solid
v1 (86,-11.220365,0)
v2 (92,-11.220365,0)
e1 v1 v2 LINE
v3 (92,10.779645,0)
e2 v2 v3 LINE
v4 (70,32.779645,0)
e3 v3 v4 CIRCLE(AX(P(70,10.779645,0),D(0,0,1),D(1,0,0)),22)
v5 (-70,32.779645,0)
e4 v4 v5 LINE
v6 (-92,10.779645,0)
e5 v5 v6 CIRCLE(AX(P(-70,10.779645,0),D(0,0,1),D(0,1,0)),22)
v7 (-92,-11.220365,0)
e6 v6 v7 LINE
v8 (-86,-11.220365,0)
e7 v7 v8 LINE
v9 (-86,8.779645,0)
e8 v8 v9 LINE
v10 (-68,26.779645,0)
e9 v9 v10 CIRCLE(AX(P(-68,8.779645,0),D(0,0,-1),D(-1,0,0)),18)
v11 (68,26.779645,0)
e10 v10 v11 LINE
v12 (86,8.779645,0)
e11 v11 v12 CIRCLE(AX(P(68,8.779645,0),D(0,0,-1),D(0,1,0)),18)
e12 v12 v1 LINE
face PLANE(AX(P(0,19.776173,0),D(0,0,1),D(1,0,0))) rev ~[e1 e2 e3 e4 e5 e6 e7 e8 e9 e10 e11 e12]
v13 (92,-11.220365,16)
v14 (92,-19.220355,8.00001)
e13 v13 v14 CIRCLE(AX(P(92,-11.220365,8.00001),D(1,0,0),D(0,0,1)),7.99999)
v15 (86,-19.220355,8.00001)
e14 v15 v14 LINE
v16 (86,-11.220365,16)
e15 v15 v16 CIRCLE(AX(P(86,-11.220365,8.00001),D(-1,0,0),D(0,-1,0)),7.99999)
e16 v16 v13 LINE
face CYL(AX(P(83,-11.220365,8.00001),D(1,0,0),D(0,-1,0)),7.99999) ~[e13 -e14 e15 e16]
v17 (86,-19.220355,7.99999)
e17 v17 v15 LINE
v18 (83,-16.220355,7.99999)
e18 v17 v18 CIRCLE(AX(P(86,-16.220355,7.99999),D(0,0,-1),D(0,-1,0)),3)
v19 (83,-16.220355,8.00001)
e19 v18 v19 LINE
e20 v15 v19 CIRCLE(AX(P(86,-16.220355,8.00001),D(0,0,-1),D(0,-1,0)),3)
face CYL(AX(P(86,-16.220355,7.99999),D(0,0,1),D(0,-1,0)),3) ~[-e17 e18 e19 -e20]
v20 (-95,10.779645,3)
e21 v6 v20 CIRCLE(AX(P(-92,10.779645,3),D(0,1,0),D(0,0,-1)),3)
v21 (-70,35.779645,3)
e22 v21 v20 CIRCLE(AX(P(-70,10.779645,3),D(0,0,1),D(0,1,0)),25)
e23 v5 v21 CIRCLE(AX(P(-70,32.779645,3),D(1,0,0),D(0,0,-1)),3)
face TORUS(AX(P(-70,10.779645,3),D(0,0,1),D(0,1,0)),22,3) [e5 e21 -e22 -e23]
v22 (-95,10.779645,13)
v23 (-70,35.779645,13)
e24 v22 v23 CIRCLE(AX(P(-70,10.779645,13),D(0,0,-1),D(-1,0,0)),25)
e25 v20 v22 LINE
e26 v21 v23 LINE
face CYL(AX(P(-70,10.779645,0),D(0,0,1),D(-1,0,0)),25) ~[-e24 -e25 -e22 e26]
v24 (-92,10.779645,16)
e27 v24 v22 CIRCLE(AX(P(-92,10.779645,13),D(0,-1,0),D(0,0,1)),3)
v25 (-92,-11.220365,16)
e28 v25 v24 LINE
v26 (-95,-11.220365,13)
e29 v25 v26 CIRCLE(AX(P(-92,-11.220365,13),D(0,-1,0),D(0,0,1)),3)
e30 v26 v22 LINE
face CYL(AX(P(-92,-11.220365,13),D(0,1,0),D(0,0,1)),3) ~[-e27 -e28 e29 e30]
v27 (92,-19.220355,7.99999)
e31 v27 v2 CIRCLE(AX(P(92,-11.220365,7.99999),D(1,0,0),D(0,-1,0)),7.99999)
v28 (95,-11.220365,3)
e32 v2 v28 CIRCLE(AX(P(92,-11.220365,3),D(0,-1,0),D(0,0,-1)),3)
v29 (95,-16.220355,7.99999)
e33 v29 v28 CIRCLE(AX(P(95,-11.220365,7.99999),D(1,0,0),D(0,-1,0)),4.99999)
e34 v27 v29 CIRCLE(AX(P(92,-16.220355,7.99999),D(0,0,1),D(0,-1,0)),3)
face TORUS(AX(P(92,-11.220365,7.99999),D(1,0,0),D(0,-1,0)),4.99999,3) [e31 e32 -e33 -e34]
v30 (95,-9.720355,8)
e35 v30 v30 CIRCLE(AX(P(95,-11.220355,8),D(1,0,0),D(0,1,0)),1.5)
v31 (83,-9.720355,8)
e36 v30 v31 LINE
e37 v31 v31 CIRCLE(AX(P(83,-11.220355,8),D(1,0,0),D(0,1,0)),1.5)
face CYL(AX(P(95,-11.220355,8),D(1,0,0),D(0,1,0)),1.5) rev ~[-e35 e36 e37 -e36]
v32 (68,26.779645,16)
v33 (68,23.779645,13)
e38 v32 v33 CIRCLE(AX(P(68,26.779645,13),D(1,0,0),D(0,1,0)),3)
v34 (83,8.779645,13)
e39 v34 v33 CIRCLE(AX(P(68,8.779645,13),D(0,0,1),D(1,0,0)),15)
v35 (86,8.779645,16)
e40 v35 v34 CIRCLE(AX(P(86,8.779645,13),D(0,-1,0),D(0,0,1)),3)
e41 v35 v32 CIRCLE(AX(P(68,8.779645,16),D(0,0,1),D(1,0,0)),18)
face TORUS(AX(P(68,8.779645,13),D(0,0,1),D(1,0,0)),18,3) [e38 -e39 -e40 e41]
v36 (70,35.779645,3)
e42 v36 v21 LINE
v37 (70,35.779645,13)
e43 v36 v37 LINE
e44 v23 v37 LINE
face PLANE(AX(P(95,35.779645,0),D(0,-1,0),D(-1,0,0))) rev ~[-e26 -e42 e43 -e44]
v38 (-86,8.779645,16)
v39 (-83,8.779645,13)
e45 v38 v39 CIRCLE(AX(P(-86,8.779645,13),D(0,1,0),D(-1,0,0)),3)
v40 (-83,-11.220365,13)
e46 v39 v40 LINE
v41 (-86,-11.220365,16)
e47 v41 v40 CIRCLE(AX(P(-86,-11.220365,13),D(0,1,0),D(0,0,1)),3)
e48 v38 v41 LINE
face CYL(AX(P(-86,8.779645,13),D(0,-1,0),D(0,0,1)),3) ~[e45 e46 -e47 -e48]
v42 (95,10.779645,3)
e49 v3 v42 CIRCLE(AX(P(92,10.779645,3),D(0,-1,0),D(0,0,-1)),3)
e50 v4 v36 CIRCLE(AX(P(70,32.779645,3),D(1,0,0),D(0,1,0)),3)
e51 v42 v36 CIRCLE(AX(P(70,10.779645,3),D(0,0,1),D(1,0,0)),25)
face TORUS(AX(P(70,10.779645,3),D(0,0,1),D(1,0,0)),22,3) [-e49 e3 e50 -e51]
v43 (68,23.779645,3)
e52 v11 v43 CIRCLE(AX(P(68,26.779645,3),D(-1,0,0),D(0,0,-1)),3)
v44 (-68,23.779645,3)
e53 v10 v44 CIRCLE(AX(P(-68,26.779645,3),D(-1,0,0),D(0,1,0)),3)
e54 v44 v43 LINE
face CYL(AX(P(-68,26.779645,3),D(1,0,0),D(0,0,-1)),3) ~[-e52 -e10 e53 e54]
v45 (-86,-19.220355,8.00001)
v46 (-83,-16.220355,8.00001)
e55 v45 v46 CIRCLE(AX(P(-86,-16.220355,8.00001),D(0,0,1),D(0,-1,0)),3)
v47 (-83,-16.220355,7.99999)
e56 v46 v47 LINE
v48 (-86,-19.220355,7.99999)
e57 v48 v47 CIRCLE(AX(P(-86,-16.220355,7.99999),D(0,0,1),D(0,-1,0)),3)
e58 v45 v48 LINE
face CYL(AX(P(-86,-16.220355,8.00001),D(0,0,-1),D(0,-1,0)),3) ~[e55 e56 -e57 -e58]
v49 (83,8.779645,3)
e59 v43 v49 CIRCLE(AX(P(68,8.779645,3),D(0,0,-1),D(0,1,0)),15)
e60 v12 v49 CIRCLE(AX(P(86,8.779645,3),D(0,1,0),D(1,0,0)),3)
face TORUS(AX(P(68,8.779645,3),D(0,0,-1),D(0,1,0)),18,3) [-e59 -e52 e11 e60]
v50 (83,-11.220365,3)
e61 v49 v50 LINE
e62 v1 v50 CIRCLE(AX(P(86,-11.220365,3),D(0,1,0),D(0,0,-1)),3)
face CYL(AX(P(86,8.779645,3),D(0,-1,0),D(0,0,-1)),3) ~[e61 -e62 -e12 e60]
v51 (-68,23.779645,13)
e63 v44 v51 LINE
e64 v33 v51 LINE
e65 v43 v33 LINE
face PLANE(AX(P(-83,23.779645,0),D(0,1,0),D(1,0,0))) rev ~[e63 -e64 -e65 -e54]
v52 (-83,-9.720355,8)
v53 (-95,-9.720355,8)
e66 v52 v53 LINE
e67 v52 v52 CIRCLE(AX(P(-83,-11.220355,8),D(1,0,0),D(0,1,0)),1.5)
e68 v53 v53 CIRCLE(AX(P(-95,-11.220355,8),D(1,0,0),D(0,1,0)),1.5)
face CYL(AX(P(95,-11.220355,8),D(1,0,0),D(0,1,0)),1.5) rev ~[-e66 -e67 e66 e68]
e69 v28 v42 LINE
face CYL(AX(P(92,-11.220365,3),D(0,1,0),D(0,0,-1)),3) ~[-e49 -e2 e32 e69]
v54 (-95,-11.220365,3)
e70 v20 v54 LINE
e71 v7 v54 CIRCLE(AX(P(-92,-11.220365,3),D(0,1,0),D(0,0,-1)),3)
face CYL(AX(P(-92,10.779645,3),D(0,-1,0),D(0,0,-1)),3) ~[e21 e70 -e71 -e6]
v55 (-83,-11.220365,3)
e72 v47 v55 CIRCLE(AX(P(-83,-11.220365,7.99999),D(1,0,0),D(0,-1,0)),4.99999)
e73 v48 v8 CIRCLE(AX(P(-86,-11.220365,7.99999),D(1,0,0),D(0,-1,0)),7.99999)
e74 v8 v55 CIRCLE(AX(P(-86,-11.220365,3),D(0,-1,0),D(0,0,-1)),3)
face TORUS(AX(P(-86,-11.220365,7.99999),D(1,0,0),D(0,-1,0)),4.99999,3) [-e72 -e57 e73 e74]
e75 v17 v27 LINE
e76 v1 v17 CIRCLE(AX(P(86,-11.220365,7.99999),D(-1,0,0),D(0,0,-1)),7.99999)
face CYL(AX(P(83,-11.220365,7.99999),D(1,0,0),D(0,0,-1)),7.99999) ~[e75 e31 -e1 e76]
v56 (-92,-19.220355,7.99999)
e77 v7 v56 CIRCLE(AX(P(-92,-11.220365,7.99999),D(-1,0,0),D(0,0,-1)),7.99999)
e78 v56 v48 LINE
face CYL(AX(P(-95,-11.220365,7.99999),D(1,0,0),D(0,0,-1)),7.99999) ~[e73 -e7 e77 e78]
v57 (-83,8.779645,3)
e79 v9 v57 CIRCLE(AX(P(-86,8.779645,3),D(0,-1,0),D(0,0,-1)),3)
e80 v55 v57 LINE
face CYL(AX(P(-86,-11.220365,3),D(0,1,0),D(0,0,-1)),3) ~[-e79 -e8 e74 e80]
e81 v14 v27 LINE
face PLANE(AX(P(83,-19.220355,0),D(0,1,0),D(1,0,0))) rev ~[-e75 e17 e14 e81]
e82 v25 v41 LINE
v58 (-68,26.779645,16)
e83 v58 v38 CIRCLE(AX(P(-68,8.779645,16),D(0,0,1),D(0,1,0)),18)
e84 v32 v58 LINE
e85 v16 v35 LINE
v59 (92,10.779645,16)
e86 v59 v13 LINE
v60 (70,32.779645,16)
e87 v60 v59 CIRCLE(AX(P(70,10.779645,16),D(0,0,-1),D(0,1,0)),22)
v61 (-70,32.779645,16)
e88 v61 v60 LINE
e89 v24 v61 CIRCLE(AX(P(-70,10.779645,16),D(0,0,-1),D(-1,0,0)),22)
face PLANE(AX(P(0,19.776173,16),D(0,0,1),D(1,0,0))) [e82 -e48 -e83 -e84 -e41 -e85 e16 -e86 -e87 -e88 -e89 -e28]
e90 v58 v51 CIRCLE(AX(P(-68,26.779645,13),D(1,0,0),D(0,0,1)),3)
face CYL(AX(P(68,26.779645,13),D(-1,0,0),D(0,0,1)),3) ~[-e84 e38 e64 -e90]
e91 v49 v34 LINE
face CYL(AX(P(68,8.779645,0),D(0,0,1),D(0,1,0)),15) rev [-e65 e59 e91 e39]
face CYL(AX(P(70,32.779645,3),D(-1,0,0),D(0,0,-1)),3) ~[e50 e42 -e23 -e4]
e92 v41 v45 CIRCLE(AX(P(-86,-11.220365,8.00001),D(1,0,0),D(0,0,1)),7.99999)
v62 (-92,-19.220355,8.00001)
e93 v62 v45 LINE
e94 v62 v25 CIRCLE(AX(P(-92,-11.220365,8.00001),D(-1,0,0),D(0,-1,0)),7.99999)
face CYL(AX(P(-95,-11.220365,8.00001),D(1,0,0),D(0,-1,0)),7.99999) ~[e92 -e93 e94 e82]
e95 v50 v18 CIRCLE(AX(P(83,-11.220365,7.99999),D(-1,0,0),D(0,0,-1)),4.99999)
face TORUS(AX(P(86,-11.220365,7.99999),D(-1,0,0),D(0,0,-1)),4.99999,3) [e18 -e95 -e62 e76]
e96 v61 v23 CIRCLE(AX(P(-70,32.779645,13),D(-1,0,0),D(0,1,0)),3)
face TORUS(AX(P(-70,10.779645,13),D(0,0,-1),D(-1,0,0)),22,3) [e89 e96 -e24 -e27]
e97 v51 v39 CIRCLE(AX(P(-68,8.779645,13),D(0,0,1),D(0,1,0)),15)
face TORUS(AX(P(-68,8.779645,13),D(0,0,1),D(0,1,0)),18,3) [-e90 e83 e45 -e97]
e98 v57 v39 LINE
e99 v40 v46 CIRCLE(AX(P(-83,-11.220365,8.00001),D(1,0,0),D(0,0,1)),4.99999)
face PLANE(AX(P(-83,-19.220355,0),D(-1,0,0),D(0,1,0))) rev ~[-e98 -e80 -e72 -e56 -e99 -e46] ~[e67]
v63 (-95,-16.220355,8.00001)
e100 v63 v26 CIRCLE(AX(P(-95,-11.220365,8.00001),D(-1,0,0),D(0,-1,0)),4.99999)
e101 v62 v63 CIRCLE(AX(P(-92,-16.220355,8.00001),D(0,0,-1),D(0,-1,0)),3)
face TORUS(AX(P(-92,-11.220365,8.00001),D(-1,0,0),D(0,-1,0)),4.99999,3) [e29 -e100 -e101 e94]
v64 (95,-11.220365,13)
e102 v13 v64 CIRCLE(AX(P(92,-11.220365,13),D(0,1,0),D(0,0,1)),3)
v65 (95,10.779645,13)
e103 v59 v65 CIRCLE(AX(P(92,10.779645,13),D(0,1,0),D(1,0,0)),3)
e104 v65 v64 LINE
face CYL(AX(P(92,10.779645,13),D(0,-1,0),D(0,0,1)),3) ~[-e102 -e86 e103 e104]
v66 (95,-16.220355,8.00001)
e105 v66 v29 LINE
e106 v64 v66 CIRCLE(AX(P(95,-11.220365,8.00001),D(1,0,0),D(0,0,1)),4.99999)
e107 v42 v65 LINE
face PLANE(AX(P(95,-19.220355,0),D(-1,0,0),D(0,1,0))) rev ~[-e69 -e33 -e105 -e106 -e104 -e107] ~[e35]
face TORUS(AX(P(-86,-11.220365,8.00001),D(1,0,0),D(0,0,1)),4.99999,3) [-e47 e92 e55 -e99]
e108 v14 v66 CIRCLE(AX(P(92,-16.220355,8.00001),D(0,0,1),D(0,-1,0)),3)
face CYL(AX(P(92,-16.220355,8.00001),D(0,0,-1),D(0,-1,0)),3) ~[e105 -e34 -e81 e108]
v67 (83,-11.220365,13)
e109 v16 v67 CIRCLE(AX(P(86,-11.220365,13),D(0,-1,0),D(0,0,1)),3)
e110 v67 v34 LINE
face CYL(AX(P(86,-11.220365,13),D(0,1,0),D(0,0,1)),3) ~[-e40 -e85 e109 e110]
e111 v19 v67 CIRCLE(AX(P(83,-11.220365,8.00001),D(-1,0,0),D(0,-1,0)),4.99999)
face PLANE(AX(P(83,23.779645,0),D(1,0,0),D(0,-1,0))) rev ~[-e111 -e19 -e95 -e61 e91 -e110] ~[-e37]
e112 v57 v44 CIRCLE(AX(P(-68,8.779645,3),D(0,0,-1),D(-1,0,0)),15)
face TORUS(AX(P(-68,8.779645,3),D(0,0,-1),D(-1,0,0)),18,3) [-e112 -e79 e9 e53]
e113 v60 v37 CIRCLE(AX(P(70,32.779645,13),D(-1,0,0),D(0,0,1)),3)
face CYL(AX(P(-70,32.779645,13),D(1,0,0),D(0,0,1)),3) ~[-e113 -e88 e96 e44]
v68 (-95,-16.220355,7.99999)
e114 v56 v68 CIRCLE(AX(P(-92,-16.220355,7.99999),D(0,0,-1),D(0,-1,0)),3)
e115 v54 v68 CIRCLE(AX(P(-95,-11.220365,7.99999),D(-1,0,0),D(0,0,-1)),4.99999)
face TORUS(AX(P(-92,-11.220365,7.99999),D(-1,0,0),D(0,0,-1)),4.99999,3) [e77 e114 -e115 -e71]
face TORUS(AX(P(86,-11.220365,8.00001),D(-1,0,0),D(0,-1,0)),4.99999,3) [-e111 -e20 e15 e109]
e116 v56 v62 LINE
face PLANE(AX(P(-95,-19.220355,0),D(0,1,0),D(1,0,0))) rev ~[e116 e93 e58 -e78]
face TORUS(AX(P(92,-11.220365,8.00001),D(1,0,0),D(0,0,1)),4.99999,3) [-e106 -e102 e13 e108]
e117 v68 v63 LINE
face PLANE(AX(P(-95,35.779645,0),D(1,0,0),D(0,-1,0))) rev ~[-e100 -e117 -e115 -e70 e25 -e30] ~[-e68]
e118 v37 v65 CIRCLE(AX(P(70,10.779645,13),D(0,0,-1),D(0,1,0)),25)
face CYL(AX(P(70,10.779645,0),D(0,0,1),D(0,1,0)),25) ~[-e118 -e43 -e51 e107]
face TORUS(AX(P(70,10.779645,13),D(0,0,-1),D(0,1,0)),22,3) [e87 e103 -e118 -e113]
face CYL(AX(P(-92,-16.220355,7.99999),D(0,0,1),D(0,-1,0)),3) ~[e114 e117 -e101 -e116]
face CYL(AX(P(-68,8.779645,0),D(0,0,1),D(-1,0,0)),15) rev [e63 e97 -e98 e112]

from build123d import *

# Parameters (mm, degrees)
F1_DEPTH = 16
F2_R     = 15
F3_R     = 25
F4_R     = 7.99999
F5_R     = 1.5
F6_DEPTH = 250
F7_R     = 3


# Not quite as in the source:
# - a fillet or chamfer is up to 0.001 mm smaller than in the source, because OpenCascade refuses the exact size


with BuildPart() as f1:
    # F0 (on Top) → F1 (new body)
    with BuildSketch(Plane.XY):
        Polygon((95, 35.7796452148), (0, 35.7796452148), (-95, 35.7796452148), (-95, -19.2203547852), (-83, -19.2203547852), (-83, 23.7796452148), (0, 23.7796452148), (83, 23.7796452148), (83, -19.2203547852), (95, -19.2203547852), align=None)
    extrude(amount=F1_DEPTH)

    # F2
    f2_edges = [f1.edges().sort_by_distance(p)[0] for p in [
        (-83, 23.779645, 8),
        (83, 23.779645, 8),
    ]]
    fillet(f2_edges, radius=F2_R)

    # F3
    f3_edges = [f1.edges().sort_by_distance(p)[0] for p in [
        (-95, 35.779645, 8),
        (95, 35.779645, 8),
    ]]
    fillet(f3_edges, radius=F3_R)

    # F4 (radius 8 in the source; OpenCascade refuses exactly that, so slightly less here)
    f4_edges = [f1.edges().sort_by_distance(p)[0] for p in [
        (-89, -19.220355, 16),
        (-89, -19.220355, 0),
        (89, -19.220355, 16),
        (89, -19.220355, 0),
    ]]
    fillet(f4_edges, radius=F4_R)

    # F5 (on face) → F6 (cut)
    with BuildSketch(Plane.YZ.offset(95)):
        with Locations((-11.2203547852, 8)):
            Circle(F5_R)
    extrude(amount=-F6_DEPTH, mode=Mode.SUBTRACT)

    # F7
    f7_edges = [f1.edges().sort_by_distance(p)[0] for p in [
        (-95, -0.22036, 0),
        (-89, -11.220365, 0),
        (-87.67767, 28.457315, 0),
        (-83, -1.22036, 0),
        (0, 35.779645, 0),
        (-78.606602, 19.386247, 0),
        (87.67767, 28.457315, 0),
        (0, 23.779645, 0),
        (95, -0.22036, 0),
        (78.606602, 19.386247, 0),
        (89, -11.220365, 0),
        (83, -1.22036, 0),
    ]]
    fillet(f7_edges, radius=F7_R)


solid = f1.part
